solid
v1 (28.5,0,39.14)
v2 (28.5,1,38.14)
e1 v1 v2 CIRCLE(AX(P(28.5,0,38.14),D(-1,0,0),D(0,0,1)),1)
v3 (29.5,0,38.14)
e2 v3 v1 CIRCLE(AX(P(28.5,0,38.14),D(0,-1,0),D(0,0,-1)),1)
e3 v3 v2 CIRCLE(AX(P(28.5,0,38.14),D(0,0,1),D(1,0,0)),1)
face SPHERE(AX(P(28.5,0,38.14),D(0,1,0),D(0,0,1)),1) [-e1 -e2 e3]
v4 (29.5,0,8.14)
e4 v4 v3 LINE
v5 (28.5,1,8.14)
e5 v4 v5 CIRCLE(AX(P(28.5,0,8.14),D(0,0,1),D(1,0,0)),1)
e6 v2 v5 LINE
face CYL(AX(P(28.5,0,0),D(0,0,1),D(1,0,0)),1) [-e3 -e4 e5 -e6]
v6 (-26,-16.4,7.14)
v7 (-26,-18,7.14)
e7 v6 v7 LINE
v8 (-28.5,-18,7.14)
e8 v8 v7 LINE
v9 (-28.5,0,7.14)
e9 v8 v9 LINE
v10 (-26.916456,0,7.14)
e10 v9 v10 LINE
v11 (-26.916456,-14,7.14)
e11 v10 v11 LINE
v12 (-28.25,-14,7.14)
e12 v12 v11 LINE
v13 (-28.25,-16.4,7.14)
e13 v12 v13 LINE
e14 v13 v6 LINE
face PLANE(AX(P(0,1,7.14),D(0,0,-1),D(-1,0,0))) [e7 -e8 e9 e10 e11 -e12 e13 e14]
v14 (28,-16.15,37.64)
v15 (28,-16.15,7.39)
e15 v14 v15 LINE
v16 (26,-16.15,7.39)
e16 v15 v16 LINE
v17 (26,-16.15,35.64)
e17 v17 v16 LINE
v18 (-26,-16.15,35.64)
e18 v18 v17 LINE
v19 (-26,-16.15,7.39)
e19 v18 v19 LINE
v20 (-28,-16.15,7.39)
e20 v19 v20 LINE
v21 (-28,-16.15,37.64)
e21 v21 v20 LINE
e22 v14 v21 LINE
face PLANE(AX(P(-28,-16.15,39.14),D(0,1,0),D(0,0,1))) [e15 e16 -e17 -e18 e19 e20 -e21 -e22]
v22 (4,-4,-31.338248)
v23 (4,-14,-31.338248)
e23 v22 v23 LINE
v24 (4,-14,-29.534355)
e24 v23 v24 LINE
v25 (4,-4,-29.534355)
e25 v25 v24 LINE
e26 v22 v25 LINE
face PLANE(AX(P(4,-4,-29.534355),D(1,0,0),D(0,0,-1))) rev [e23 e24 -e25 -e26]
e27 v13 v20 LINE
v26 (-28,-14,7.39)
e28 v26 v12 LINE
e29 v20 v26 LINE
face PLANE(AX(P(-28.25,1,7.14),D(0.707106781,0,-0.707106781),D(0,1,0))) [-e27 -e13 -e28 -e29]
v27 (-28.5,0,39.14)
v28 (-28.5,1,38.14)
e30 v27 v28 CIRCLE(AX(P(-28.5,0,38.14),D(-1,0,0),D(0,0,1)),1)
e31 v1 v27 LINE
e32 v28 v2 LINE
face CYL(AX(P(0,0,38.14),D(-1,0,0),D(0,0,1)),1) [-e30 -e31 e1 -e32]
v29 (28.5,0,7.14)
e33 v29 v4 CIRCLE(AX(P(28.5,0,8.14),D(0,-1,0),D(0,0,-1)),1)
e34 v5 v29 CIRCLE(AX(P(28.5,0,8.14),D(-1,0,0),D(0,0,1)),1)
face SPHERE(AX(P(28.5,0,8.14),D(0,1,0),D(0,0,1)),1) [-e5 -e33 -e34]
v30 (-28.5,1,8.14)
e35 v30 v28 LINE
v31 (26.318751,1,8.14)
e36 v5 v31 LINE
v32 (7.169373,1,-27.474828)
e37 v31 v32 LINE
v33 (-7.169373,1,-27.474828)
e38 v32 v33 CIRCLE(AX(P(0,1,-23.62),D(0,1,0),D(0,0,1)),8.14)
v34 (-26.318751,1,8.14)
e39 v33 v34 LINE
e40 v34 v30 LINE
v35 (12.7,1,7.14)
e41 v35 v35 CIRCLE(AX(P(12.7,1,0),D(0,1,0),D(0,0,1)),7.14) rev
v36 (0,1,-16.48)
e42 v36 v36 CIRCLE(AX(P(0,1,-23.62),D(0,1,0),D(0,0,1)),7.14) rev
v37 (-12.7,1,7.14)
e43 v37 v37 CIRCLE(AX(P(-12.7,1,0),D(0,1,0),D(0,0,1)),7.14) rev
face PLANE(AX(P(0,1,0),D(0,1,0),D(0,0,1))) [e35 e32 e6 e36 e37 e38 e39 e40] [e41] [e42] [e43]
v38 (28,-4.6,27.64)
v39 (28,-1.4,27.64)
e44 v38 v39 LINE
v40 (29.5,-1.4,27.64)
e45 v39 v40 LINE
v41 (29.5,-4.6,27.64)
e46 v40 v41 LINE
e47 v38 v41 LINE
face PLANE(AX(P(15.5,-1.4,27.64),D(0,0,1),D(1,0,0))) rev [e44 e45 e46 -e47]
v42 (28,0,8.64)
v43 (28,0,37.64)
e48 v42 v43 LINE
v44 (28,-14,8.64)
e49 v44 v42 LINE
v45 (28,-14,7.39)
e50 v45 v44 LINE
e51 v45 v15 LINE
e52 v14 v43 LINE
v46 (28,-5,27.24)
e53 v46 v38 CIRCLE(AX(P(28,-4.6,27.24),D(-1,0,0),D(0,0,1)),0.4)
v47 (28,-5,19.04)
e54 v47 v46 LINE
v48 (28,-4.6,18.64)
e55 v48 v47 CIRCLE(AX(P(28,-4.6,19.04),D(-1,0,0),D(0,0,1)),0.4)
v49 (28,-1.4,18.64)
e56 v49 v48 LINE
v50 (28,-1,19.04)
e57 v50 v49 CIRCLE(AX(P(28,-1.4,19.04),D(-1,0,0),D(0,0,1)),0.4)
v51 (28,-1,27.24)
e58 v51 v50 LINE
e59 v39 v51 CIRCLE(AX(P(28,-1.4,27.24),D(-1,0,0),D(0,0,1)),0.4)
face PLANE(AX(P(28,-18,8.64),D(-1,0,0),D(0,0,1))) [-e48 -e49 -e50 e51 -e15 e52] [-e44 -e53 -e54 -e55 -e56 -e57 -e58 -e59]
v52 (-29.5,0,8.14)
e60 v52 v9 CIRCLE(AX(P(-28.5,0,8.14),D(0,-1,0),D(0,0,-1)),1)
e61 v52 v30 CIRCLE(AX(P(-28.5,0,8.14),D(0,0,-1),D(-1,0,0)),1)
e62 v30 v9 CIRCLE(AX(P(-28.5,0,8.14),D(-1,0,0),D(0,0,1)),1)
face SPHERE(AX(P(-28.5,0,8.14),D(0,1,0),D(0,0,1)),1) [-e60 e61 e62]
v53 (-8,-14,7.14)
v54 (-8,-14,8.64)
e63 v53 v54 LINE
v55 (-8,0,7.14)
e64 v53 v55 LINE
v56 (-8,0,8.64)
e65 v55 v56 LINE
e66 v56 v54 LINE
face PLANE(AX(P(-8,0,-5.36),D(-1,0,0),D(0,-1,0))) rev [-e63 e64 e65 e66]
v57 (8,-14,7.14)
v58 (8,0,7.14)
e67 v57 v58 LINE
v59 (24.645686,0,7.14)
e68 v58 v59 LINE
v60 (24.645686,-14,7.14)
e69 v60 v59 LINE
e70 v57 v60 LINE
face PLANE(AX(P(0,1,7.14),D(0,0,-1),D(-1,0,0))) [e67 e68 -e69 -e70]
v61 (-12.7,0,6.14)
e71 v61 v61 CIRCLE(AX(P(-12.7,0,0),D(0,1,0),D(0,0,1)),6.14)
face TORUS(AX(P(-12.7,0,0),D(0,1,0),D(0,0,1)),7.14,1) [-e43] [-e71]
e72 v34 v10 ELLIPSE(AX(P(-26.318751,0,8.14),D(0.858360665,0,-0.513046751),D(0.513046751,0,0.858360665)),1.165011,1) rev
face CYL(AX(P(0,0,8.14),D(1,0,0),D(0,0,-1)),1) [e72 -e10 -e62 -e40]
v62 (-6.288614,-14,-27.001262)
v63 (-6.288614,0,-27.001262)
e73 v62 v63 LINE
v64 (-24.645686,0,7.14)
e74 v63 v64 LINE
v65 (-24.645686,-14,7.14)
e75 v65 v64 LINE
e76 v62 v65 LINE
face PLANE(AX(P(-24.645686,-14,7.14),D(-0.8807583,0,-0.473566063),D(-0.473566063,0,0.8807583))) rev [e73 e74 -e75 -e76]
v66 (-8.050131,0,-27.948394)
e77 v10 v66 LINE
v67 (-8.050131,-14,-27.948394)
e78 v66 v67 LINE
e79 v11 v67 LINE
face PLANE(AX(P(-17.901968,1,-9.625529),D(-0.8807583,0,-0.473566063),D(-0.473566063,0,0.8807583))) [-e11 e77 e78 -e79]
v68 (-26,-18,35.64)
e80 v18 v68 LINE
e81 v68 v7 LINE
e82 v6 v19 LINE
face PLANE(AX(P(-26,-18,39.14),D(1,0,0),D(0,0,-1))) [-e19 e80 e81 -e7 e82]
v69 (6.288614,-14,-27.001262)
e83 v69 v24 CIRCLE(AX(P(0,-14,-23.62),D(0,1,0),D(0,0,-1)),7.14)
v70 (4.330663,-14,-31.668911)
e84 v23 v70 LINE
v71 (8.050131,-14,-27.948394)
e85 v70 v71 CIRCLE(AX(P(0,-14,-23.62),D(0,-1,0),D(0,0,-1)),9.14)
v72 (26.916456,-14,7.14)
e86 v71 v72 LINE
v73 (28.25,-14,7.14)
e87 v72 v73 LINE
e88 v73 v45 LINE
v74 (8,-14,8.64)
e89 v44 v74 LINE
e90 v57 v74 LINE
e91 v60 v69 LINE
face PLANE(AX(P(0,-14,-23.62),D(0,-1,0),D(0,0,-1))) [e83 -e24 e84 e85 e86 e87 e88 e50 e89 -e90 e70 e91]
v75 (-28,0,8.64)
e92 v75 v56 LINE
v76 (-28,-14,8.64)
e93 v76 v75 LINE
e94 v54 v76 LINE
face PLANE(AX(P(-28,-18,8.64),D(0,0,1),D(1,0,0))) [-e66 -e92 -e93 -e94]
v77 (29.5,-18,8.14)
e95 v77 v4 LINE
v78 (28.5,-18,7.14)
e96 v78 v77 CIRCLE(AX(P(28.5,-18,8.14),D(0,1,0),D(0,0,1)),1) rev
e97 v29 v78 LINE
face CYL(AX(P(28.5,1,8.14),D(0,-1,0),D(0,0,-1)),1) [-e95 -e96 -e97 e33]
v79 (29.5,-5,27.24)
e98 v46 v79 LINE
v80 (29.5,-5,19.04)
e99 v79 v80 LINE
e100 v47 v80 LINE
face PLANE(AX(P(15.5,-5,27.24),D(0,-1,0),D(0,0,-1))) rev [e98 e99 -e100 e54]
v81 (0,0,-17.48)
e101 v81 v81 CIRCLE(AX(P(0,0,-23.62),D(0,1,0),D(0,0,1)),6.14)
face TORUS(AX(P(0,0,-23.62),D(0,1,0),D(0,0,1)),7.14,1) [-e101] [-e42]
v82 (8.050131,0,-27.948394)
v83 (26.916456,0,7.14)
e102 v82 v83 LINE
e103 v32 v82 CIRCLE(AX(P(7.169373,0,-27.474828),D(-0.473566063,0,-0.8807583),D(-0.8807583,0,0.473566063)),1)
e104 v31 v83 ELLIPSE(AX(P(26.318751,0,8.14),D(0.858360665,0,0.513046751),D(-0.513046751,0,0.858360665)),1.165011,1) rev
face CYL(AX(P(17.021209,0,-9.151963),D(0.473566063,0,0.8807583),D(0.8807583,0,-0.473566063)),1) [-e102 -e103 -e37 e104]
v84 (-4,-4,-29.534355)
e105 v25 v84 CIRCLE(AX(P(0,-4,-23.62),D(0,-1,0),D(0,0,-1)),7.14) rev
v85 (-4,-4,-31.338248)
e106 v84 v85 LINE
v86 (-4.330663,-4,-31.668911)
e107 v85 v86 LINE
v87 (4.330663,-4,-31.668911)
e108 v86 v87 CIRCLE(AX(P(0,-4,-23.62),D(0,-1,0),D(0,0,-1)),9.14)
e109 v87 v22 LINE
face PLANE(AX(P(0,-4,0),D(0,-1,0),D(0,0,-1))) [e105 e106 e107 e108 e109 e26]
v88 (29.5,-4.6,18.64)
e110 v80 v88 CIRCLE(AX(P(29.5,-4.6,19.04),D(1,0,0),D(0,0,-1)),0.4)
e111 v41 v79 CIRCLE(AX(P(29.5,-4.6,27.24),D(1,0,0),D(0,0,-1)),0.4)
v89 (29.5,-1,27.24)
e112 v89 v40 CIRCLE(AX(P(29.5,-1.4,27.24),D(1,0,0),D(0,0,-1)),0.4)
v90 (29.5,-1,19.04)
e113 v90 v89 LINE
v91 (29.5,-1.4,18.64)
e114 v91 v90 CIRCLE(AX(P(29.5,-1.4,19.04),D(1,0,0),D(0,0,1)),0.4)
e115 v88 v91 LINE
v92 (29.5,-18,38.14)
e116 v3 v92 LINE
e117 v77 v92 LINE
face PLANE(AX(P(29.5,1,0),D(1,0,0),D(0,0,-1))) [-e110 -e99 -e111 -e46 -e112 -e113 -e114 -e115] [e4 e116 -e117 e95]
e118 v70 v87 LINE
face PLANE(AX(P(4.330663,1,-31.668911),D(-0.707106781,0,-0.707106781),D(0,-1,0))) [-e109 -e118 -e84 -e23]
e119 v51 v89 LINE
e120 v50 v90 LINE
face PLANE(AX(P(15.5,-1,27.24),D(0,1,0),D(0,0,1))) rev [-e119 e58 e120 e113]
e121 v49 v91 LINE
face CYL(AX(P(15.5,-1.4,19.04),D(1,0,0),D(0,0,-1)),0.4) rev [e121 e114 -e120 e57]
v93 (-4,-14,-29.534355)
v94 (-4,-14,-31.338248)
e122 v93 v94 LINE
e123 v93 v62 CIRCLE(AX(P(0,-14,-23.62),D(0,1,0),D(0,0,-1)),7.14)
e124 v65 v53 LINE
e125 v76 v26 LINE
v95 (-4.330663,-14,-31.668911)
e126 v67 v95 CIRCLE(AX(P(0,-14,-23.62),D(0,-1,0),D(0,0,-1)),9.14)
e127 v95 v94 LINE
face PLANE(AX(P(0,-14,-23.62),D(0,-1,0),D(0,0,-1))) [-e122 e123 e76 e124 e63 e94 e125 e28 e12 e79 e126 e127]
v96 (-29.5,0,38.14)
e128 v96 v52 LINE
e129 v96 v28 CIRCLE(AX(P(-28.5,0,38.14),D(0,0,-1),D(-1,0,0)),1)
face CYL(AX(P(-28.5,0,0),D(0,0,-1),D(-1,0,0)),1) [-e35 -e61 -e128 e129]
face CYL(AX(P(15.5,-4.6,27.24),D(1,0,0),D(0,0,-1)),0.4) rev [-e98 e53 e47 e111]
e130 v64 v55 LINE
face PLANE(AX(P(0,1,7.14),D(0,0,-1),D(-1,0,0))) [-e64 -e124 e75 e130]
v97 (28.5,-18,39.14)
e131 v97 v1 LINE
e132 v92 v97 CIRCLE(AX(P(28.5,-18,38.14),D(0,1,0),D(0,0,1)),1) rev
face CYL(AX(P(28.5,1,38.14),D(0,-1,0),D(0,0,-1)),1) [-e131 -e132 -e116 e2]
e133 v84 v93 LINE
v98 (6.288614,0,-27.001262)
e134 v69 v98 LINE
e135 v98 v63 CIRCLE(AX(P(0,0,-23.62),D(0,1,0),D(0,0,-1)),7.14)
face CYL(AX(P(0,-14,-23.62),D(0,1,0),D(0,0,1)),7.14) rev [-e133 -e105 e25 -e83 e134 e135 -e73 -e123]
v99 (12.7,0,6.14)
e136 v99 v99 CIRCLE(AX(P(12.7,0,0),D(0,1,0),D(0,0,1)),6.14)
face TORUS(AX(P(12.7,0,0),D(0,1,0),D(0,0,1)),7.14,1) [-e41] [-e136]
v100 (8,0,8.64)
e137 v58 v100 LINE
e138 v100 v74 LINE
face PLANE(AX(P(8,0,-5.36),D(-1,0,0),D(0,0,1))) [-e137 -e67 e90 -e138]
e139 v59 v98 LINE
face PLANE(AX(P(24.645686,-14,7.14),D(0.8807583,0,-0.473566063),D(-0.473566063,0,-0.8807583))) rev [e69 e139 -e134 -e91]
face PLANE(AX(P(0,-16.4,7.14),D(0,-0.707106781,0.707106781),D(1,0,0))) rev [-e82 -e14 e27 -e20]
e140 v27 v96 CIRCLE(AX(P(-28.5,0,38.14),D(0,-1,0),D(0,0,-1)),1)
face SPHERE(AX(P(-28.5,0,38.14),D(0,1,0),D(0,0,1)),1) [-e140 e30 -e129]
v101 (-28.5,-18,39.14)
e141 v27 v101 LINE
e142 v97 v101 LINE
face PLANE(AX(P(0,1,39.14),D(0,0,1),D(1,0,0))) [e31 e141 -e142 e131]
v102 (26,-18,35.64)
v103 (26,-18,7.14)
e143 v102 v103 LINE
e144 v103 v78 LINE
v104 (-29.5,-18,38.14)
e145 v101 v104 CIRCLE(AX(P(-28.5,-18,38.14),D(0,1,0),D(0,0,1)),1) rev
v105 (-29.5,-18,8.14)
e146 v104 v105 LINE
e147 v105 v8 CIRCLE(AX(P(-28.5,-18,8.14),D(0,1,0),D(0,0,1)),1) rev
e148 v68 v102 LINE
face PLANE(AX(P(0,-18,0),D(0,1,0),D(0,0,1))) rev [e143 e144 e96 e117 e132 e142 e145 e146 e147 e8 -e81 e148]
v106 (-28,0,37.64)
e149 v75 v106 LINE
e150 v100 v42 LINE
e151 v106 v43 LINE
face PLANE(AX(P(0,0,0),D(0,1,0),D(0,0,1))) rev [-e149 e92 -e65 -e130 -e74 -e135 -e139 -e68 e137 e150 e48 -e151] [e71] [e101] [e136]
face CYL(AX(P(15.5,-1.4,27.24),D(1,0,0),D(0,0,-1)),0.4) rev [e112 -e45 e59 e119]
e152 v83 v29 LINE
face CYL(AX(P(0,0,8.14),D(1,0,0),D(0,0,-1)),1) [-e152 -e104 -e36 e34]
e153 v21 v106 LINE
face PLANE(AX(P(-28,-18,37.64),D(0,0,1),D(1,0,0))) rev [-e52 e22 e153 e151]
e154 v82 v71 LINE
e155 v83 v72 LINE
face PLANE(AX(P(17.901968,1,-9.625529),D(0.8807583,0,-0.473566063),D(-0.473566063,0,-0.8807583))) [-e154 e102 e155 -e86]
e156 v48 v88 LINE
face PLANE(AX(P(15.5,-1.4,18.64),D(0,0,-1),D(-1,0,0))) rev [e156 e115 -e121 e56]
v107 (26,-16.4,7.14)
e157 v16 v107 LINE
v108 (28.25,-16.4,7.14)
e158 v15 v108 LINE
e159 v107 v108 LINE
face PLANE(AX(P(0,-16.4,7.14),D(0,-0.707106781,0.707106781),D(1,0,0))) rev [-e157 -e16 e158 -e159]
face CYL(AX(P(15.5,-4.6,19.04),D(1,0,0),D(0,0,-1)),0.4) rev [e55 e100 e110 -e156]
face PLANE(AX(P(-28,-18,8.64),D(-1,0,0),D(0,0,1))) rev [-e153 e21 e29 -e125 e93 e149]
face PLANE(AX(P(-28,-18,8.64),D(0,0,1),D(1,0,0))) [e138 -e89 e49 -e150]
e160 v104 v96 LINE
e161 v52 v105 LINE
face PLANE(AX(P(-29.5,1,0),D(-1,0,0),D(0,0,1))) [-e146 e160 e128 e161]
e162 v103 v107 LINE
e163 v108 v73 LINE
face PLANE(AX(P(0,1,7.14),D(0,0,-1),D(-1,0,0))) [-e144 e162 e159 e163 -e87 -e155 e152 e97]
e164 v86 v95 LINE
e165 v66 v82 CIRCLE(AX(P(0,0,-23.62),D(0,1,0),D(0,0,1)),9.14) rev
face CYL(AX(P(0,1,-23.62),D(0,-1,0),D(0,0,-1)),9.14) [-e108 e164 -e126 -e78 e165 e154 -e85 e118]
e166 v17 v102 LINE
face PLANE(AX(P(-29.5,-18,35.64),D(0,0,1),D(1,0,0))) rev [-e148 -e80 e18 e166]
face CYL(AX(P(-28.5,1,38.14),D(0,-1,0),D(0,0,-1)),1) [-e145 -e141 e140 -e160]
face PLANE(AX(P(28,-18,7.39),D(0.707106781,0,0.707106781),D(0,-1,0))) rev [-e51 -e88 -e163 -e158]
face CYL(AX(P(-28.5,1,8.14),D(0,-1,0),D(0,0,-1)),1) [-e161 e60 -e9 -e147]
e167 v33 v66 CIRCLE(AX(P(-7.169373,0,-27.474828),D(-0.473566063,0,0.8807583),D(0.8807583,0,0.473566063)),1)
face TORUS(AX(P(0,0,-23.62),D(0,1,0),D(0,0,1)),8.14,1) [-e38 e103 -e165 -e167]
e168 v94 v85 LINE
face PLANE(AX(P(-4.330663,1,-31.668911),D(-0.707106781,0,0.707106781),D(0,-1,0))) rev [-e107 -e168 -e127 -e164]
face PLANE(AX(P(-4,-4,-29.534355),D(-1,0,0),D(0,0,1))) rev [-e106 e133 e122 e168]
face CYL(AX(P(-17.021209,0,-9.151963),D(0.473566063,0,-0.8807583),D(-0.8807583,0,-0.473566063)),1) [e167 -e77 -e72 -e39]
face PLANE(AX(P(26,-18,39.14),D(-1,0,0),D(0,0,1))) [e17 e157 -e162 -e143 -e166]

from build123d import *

# Parameters (mm, degrees)
SKETCH1_R           = 6.14
BOSS_EXTRUDE1_DEPTH = 1
BOSS_EXTRUDE2_START = -18
SKETCH1_7_R         = 6.14
SKETCH1_7_W         = 59
SKETCH1_7_H         = 32
SKETCH1_7_W_2       = 56
SKETCH1_7_H_2       = 29
BOSS_EXTRUDE2_DEPTH = 18
BOSS_EXTRUDE4_DEPTH = 14
FILLET1_R           = 1
CUT_EXTRUDE2_DEPTH  = 14
CUT_EXTRUDE3_DEPTH  = 14
FILLET2_R           = 1
SKETCH24_W          = 56
SKETCH24_H          = 1.5
CUT_EXTRUDE5_DEPTH  = 4
BOSS_EXTRUDE5_REACH = 54.785
SKETCH26_W          = 2
SKETCH26_H          = 1.85
BOSS_EXTRUDE6_REACH = 72.258
SKETCH27_W          = 2
SKETCH27_H          = 1.85
SKETCH29_W          = 8
SKETCH29_H          = 5
CUT_EXTRUDE7_DEPTH  = 10
CHAMFER1_SIZE       = 0.5
CHAMFER2_SIZE       = 0.25


# Some blends are built 0.0001 mm under size
with BuildPart() as part:
    # Sketch1 → Boss-Extrude1 (new body)
    with BuildSketch(Plane(origin=(0, 0, 0), x_dir=(1, 0, 0), z_dir=(0, 1, 0))):
        with BuildLine():
            Line((26.916456077, -7.14), (8.050130866, 27.948393818))
            ThreePointArc((8.050130866, 27.948393818), (0, 32.76), (-8.050130866, 27.948393818))
            Line((-8.050130866, 27.948393818), (-26.916456077, -7.14))
            Line((-26.916456077, -7.14), (-29.5, -7.14))
            Line((-29.5, -7.14), (-29.5, -39.14))
            Line((-29.5, -39.14), (29.5, -39.14))
            Line((29.5, -39.14), (29.5, -7.14))
            Line((29.5, -7.14), (26.916456077, -7.14))
        make_face()
        with Locations(Location((-12.7, 0, 0), (0, 0, 270))):
            Circle(SKETCH1_R, mode=Mode.SUBTRACT)
        with Locations(Location((0, 23.62, 0), (0, 0, 270))):
            Circle(SKETCH1_R, mode=Mode.SUBTRACT)
        with Locations(Location((12.7, 0, 0), (0, 0, 270))):
            Circle(SKETCH1_R, mode=Mode.SUBTRACT)
    extrude(amount=BOSS_EXTRUDE1_DEPTH)

    # Sketch1<7> → Boss-Extrude2 (add)
    # profile 1 of 4: a face of its own
    with BuildSketch(Plane(origin=(0, 0, 0), x_dir=(1, 0, 0), z_dir=(0, 1, 0)).offset(BOSS_EXTRUDE2_START)):
        with Locations(Location((-12.7, 0, 0), (0, 0, 270))):
            Circle(SKETCH1_7_R)
    # profile 2 of 4: a face of its own
    with BuildSketch(Plane(origin=(0, 0, 0), x_dir=(1, 0, 0), z_dir=(0, 1, 0)).offset(BOSS_EXTRUDE2_START)):
        with Locations(Location((0, 23.62, 0), (0, 0, 270))):
            Circle(SKETCH1_7_R)
    # profile 3 of 4: a face of its own
    with BuildSketch(Plane(origin=(0, 0, 0), x_dir=(1, 0, 0), z_dir=(0, 1, 0)).offset(BOSS_EXTRUDE2_START)):
        with Locations(Location((12.7, 0, 0), (0, 0, 270))):
            Circle(SKETCH1_7_R)
    # profile 4 of 4: a face of its own
    with BuildSketch(Plane(origin=(0, 0, 0), x_dir=(1, 0, 0), z_dir=(0, 1, 0)).offset(BOSS_EXTRUDE2_START)):
        with Locations((0, -23.14)):
            Rectangle(SKETCH1_7_W, SKETCH1_7_H)
        with Locations((0, -23.14)):
            Rectangle(SKETCH1_7_W_2, SKETCH1_7_H_2, mode=Mode.SUBTRACT)
    extrude(amount=BOSS_EXTRUDE2_DEPTH)


with BuildPart() as boss_extrude2_kept_piece:
    # of the separate pieces the step leaves, the one the design keeps (boss_extrude2_pieces_kept)
    add(part.part.solids().sort_by_distance((26.916456077, 0, 7.14))[0])

    # Sketch16 → Boss-Extrude4 (add)
    with BuildSketch(Plane.XZ):
        with BuildLine():
            Line((-24.645685539, 7.14), (-6.288614265, -27.001261692))
            ThreePointArc((-6.288614265, -27.001261692), (0, -30.76), (6.288614265, -27.001261692))
            Line((6.288614265, -27.001261692), (24.645685539, 7.14))
            Line((24.645685539, 7.14), (26.916456077, 7.14))
            Line((26.916456077, 7.14), (8.050130866, -27.948393818))
            ThreePointArc((8.050130866, -27.948393818), (0, -32.76), (-8.050130866, -27.948393818))
            Line((-8.050130866, -27.948393818), (-26.916456077, 7.14))
            Line((-26.916456077, 7.14), (-24.645685539, 7.14))
        make_face()
    extrude(amount=BOSS_EXTRUDE4_DEPTH)

    # Fillet1
    fillet1_edges = [boss_extrude2_kept_piece.edges().sort_by_distance(p)[0] for p in [
        (-29.5, -8.5, 7.14),
        (29.5, -8.5, 7.14),
        (29.5, -8.5, 39.14),
        (-29.5, -8.5, 39.14),
    ]]
    fillet(fillet1_edges, radius=FILLET1_R)

    # Sketch19 → Cut-Extrude2 (cut)
    with BuildSketch(Plane(origin=(29.5, 0, 0), x_dir=(0, 0, -1), z_dir=(1, 0, 0))):
        with BuildLine():
            Line((-27.24, -1), (-19.04, -1))
            ThreePointArc((-19.04, -1), (-18.757157288, -1.117157288), (-18.64, -1.4))
            Line((-18.64, -1.4), (-18.64, -4.6))
            ThreePointArc((-18.64, -4.6), (-18.757157288, -4.882842712), (-19.04, -5))
            Line((-19.04, -5), (-27.24, -5))
            ThreePointArc((-27.24, -5), (-27.522842712, -4.882842712), (-27.64, -4.6))
            Line((-27.64, -4.6), (-27.64, -1.4))
            ThreePointArc((-27.64, -1.4), (-27.522842712, -1.117157288), (-27.24, -1))
        make_face()
    extrude(amount=-CUT_EXTRUDE2_DEPTH, mode=Mode.SUBTRACT)

    # Sketch21 → Cut-Extrude3 (cut)
    with BuildSketch(Plane.XY.offset(8.64)):
        Polygon((8, 0), (-8, 0), (-8, -5.911265283), (-8, -14), (8, -14), (8, -5.911265283), align=None)
    extrude(amount=-CUT_EXTRUDE3_DEPTH, mode=Mode.SUBTRACT)

    # Fillet2
    fillet2_edges = [boss_extrude2_kept_piece.edges().sort_by_distance(p)[0] for p in [
        (0, 1, 39.14),
        (-29.5, 1, 23.14),
        (29.5, 1, 23.14),
        (-27.708228038, 1, 7.14),
        (29.207106781, 1, 7.432893219),
        (29.207106781, 1, 38.847106781),
        (-29.207106781, 1, 7.432893219),
        (-29.207106781, 1, 38.847106781),
        (27.708228038, 1, 7.14),
        (17.483293471, 1, -10.404196909),
        (0, 1, -32.76),
        (-17.483293471, 1, -10.404196909),
        (-12.7, 1, -6.14),
        (0, 1, -29.76),
        (12.7, 1, -6.14),
    ]]
    fillet(fillet2_edges, radius=FILLET2_R - 0.0001)  # a hair under: the kernel refuses the full size

    # Sketch24 → Cut-Extrude5 (cut)
    with BuildSketch(Plane(origin=(0, -18, 0), x_dir=(-1, 0, 0), z_dir=(0, -1, 0))):
        with Locations((0, -7.89)):
            Rectangle(SKETCH24_W, SKETCH24_H)
    extrude(amount=-CUT_EXTRUDE5_DEPTH, mode=Mode.SUBTRACT)

    # Sketch26 → Boss-Extrude5 (add, up to next)
    with BuildSketch(Plane(origin=(0, 0, 7.14), x_dir=(-1, 0, 0), z_dir=(0, 0, -1)), mode=Mode.PRIVATE) as boss_extrude5_sk1:
        with Locations((27, -17.075)):
            Rectangle(SKETCH26_W, SKETCH26_H)
    boss_extrude5_tool1 = extrude(boss_extrude5_sk1.sketch, amount=-BOSS_EXTRUDE5_REACH, mode=Mode.PRIVATE) - boss_extrude2_kept_piece.part
    # Sketch26 → Boss-Extrude5 (add, up to next)
    with BuildSketch(Plane(origin=(0, 0, 7.14), x_dir=(-1, 0, 0), z_dir=(0, 0, -1)), mode=Mode.PRIVATE) as boss_extrude5_sk2:
        with Locations((-27, -17.075)):
            Rectangle(SKETCH26_W, SKETCH26_H)
    boss_extrude5_tool2 = extrude(boss_extrude5_sk2.sketch, amount=-BOSS_EXTRUDE5_REACH, mode=Mode.PRIVATE) - boss_extrude2_kept_piece.part
    add(boss_extrude5_tool1.solids().sort_by_distance((-27, -17.075, 7.14))[0])
    add(boss_extrude5_tool2.solids().sort_by_distance((27, -17.075, 7.14))[0])

    # Sketch27 → Boss-Extrude6 (add, up to next)
    with BuildSketch(Plane.ZY.offset(-26), mode=Mode.PRIVATE) as boss_extrude6_sk1:
        with Locations((36.64, -17.075)):
            Rectangle(SKETCH27_W, SKETCH27_H)
    boss_extrude6_tool1 = extrude(boss_extrude6_sk1.sketch, amount=BOSS_EXTRUDE6_REACH, mode=Mode.PRIVATE) - boss_extrude2_kept_piece.part
    add(boss_extrude6_tool1.solids().sort_by_distance((26, -17.075, 36.64))[0])

    # Sketch29 → Cut-Extrude7 (cut)
    with BuildSketch(Plane.XZ.offset(14)):
        with Locations((0, -32.034355417)):
            Rectangle(SKETCH29_W, SKETCH29_H)
    extrude(amount=-CUT_EXTRUDE7_DEPTH, mode=Mode.SUBTRACT)

    # Chamfer1
    # the kernel refuses this chamfer: 0.5, 0.374030712 mm, written as the material it takes off along each edge
    with BuildSketch(Plane(origin=(-4, -4, -31.838247988), x_dir=(-0.89007215049111, 0, 0.4558196649116082), z_dir=(0, -1, 0))) as chamfer1_piece_1:
        with BuildLine():
            Line((0.371500885, 0), (CHAMFER1_SIZE * 0.455819664912, -CHAMFER1_SIZE * 0.890072150491))
            Line((CHAMFER1_SIZE * 0.455819664912, -CHAMFER1_SIZE * 0.890072150491), (0, 0))
            ThreePointArc((0, 0), (0.18881851, 0.001887165), (0.371500885, 0))
        make_face()
    extrude(amount=11.285841494, mode=Mode.SUBTRACT)
    with BuildSketch(Plane(origin=(4, -4, -31.838247988), x_dir=(0.8900721504911105, 0, 0.4558196649116072), z_dir=(0, -1, 0))) as chamfer1_piece_2:
        with BuildLine():
            Line((0.371500885, 0), (CHAMFER1_SIZE * 0.455819664912, CHAMFER1_SIZE * 0.890072150491))
            Line((CHAMFER1_SIZE * 0.455819664912, CHAMFER1_SIZE * 0.890072150491), (0, 0))
            ThreePointArc((0, 0), (0.18881851, -0.001887165), (0.371500885, 0))
        make_face()
    extrude(amount=11.285841494, mode=Mode.SUBTRACT)

    # Chamfer2
    chamfer2_edges = [boss_extrude2_kept_piece.edges().sort_by_distance(p)[0] for p in [
        (28, -15.075, 7.14),
        (-28, -15.075, 7.14),
        (-27, -16.15, 7.14),
        (27, -16.15, 7.14),
    ]]
    chamfer(chamfer2_edges, length=CHAMFER2_SIZE)


solid = boss_extrude2_kept_piece.part
